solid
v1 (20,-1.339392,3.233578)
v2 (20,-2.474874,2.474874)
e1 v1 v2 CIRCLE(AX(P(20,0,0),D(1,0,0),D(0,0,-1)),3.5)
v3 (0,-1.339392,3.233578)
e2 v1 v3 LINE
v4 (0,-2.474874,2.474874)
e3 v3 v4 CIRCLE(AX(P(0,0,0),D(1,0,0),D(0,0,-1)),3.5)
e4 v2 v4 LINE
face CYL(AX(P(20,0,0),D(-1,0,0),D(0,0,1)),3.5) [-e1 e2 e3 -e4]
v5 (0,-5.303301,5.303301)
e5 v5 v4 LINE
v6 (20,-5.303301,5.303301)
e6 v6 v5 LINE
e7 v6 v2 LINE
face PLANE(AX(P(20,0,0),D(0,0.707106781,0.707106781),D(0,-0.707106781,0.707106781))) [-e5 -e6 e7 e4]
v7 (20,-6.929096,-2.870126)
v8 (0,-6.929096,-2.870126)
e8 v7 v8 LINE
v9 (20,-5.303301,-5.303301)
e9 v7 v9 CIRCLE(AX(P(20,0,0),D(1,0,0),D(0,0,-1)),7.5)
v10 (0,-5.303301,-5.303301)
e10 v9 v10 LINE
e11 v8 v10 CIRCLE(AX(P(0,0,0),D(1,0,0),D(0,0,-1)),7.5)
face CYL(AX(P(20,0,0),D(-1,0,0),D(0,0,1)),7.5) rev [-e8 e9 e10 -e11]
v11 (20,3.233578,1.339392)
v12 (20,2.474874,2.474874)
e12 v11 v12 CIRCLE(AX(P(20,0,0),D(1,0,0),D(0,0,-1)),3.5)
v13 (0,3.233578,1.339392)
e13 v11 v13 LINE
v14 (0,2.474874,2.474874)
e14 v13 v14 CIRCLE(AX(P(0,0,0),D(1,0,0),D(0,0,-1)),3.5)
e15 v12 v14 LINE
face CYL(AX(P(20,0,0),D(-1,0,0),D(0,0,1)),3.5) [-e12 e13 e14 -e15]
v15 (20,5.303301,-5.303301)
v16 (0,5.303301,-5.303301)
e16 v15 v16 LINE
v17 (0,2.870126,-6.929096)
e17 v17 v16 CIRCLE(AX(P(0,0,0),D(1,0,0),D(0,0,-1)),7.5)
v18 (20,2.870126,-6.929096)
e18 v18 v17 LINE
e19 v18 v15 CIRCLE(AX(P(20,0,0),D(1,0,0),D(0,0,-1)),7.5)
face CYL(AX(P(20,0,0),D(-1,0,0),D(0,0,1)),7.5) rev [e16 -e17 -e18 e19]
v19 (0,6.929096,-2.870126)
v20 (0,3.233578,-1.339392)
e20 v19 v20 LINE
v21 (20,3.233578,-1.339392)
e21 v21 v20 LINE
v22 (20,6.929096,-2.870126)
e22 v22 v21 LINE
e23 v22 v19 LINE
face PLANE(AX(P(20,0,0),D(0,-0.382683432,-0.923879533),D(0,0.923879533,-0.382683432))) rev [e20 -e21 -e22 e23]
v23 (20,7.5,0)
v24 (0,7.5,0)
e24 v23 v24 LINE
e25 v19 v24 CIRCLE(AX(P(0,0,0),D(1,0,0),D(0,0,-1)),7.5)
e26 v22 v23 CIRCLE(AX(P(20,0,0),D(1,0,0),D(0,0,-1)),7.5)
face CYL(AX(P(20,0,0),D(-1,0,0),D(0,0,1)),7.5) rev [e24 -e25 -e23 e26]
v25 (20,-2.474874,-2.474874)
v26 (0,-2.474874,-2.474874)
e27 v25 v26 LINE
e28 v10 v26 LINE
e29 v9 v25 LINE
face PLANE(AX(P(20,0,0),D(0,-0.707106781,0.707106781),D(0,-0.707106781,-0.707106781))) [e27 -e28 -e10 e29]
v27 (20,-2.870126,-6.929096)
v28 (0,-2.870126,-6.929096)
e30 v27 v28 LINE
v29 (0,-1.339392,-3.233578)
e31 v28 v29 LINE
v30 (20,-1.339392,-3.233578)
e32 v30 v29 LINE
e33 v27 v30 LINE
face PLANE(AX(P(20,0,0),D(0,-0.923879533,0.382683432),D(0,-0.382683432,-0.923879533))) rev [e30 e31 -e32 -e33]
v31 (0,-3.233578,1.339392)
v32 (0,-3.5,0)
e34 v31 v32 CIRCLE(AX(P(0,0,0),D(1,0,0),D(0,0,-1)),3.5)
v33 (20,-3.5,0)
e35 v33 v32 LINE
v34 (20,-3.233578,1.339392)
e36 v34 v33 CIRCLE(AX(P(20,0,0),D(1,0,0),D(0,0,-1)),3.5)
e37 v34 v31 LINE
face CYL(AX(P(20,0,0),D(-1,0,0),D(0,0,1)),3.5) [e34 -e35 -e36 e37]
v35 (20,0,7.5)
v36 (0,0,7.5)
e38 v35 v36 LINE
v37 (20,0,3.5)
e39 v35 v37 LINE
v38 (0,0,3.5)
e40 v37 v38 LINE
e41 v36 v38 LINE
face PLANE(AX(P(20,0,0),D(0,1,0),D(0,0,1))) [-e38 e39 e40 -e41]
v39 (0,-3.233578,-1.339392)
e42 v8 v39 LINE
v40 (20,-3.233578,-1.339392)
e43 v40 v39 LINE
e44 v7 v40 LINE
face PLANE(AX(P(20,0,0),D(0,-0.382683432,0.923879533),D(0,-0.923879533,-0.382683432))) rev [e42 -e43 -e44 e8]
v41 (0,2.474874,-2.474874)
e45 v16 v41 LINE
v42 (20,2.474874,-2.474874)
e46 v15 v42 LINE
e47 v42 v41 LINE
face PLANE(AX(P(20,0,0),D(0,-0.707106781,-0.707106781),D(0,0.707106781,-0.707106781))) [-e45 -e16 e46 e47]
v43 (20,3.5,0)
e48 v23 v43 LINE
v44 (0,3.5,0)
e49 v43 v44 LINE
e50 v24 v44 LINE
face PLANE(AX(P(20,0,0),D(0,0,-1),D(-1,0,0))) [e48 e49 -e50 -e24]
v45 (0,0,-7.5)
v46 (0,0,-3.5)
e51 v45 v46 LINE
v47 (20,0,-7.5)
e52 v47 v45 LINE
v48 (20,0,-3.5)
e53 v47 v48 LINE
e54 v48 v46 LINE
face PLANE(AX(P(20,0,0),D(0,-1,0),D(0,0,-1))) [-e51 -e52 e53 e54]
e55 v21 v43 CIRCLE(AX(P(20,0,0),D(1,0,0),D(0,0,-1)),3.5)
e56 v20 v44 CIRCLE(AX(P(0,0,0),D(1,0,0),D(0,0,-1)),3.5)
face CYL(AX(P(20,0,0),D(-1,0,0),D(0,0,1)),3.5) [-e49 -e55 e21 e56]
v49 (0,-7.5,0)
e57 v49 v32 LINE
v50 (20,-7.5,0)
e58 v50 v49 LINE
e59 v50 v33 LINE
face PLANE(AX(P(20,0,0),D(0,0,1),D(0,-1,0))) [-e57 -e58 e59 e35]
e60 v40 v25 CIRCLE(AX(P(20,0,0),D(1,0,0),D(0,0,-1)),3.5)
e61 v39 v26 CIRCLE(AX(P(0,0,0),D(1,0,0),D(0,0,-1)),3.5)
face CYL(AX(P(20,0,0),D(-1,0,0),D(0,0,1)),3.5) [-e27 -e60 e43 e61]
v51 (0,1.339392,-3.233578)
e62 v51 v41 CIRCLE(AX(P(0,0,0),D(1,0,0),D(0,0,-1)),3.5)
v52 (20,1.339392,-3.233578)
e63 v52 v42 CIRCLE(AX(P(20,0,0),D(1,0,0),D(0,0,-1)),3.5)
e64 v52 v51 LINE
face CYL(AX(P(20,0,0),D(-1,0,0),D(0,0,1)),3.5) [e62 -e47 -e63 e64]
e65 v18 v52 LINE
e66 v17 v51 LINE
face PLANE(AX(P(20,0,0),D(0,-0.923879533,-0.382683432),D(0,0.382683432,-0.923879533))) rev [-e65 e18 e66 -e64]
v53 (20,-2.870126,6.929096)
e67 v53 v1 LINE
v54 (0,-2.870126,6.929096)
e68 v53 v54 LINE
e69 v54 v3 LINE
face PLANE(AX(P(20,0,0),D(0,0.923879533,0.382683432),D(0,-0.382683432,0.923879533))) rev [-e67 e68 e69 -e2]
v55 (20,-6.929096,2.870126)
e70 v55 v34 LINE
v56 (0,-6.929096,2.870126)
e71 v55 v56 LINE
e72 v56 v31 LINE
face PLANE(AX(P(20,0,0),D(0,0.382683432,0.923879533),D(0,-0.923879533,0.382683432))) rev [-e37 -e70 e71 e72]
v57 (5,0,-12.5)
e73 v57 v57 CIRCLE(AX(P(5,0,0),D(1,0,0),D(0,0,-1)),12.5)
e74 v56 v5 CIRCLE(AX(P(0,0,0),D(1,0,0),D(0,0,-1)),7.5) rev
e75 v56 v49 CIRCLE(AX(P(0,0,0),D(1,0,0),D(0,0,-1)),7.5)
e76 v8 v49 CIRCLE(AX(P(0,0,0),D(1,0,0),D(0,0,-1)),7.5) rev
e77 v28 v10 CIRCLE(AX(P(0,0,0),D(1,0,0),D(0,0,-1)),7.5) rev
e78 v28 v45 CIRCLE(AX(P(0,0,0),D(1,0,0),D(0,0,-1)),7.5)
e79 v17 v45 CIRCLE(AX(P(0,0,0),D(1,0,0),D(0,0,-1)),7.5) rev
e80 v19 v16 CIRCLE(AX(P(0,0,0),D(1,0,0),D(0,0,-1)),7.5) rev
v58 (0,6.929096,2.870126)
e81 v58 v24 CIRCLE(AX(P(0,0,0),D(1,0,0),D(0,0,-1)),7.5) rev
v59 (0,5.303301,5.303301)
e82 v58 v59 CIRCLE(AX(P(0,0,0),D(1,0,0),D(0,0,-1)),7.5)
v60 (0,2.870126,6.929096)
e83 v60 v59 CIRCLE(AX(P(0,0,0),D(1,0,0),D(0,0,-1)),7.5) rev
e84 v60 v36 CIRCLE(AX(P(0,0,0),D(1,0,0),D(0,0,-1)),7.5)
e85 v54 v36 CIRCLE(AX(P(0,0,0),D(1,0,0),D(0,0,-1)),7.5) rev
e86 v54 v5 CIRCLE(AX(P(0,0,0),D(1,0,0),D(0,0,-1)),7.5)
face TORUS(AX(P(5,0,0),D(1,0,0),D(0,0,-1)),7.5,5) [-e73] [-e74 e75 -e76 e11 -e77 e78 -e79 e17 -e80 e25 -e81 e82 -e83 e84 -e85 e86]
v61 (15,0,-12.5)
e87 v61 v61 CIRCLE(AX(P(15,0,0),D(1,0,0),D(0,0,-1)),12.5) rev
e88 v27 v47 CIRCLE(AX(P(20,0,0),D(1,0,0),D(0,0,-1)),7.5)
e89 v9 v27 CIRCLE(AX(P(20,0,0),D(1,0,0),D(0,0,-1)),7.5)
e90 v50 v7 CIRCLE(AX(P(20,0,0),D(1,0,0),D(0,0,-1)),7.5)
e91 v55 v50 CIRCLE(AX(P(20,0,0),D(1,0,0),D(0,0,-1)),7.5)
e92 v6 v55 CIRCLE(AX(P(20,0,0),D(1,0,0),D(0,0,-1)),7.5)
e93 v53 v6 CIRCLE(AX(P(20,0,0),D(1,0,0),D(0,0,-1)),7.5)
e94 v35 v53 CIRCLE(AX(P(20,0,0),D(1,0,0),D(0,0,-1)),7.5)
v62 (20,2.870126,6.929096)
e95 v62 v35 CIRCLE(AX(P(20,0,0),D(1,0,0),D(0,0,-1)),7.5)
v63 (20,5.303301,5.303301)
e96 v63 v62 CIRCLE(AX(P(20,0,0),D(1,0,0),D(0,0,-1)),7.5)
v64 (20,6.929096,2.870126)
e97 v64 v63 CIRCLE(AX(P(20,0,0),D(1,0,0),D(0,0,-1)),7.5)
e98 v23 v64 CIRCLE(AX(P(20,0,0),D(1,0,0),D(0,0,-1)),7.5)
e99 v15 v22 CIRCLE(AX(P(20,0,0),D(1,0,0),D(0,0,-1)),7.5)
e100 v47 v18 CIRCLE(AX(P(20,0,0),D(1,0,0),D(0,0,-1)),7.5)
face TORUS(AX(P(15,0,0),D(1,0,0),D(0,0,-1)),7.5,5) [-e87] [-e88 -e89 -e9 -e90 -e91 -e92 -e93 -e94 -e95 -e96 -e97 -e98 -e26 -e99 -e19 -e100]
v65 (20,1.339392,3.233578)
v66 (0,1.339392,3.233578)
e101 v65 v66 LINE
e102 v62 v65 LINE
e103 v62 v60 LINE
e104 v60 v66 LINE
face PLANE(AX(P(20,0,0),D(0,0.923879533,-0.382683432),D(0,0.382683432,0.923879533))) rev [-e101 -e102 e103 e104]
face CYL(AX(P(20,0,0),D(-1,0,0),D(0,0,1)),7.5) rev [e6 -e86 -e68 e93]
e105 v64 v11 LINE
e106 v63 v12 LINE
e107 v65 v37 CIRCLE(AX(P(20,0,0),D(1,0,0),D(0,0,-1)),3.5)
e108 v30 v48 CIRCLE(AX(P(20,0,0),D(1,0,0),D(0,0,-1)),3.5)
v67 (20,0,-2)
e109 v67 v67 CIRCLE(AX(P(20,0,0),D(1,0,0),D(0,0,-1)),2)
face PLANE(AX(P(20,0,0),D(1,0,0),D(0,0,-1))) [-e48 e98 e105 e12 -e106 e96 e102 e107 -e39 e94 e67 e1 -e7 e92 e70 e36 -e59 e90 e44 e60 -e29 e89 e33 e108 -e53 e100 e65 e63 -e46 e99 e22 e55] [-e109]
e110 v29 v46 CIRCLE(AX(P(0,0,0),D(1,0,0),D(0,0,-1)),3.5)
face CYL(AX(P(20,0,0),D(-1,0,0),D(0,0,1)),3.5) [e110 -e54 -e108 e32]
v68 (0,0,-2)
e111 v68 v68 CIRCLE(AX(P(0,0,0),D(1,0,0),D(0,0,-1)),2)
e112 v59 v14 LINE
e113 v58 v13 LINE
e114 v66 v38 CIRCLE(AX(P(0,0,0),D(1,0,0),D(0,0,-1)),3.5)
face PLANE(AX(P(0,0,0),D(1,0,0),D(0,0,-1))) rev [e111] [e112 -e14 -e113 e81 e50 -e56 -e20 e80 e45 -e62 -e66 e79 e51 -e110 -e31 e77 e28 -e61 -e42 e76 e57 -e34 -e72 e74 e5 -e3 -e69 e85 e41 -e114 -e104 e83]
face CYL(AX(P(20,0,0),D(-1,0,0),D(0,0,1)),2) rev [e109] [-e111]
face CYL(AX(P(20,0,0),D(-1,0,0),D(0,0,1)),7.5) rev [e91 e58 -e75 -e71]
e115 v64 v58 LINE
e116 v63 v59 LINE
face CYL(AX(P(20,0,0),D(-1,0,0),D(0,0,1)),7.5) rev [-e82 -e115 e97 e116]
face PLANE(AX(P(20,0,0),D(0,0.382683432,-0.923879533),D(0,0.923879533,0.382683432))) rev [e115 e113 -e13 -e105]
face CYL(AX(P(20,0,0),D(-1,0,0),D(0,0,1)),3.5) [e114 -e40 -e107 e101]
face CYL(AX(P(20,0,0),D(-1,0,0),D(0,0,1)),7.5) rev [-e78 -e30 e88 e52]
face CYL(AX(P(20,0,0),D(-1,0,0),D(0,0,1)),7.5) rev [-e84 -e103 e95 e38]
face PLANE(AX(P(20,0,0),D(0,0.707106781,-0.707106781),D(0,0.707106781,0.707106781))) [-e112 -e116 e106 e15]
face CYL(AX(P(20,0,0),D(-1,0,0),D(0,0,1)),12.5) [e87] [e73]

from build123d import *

# Parameters (mm, degrees)
SKETCH2_R           = 12.5
SKETCH2_R_2         = 2
BOSS_EXTRUDE2_DEPTH = 20
FILLET2_R           = 5


with BuildPart() as part:
    # Sketch2 → Boss-Extrude2 (new body)
    with BuildSketch(Plane(origin=(0, 0, 0), x_dir=(0, 0, -1), z_dir=(1, 0, 0))):
        Circle(SKETCH2_R)
        with BuildLine():
            Line((0, 3.5), (0, 7.5))
            ThreePointArc((0, 7.5), (1.463177415, 7.355889603), (2.870125743, 6.929096494))
            Line((2.870125743, 6.929096494), (1.339392013, 3.233578364))
            ThreePointArc((1.339392013, 3.233578364), (0.682816127, 3.432748481), (0, 3.5))
        make_face(mode=Mode.SUBTRACT)
        with BuildLine():
            Line((-2.870125743, 6.929096494), (-1.339392013, 3.233578364))
            ThreePointArc((-1.339392013, 3.233578364), (-1.944495816, 2.910143643), (-2.474873734, 2.474873734))
            Line((-2.474873734, 2.474873734), (-5.303300859, 5.303300859))
            ThreePointArc((-5.303300859, 5.303300859), (-4.166776748, 6.236022092), (-2.870125743, 6.929096494))
        make_face(mode=Mode.SUBTRACT)
        with BuildLine():
            Line((-6.929096494, 2.870125743), (-3.233578364, 1.339392013))
            ThreePointArc((-3.233578364, 1.339392013), (-3.432748481, 0.682816127), (-3.5, 0))
            Line((-3.5, 0), (-7.5, 0))
            ThreePointArc((-7.5, 0), (-7.355889603, 1.463177415), (-6.929096494, 2.870125743))
        make_face(mode=Mode.SUBTRACT)
        with BuildLine():
            Line((-6.929096494, -2.870125743), (-3.233578364, -1.339392013))
            ThreePointArc((-3.233578364, -1.339392013), (-2.910143643, -1.944495816), (-2.474873734, -2.474873734))
            Line((-2.474873734, -2.474873734), (-5.303300859, -5.303300859))
            ThreePointArc((-5.303300859, -5.303300859), (-6.236022092, -4.166776748), (-6.929096494, -2.870125743))
        make_face(mode=Mode.SUBTRACT)
        with BuildLine():
            Line((-2.870125743, -6.929096494), (-1.339392013, -3.233578364))
            ThreePointArc((-1.339392013, -3.233578364), (-0.682816127, -3.432748481), (0, -3.5))
            Line((0, -3.5), (0, -7.5))
            ThreePointArc((0, -7.5), (-1.463177415, -7.355889603), (-2.870125743, -6.929096494))
        make_face(mode=Mode.SUBTRACT)
        with BuildLine():
            Line((2.870125743, -6.929096494), (1.339392013, -3.233578364))
            ThreePointArc((1.339392013, -3.233578364), (1.944495816, -2.910143643), (2.474873734, -2.474873734))
            Line((2.474873734, -2.474873734), (5.303300859, -5.303300859))
            ThreePointArc((5.303300859, -5.303300859), (4.166776748, -6.236022092), (2.870125743, -6.929096494))
        make_face(mode=Mode.SUBTRACT)
        with BuildLine():
            Line((6.929096494, -2.870125743), (3.233578364, -1.339392013))
            ThreePointArc((3.233578364, -1.339392013), (3.432748481, -0.682816127), (3.5, 0))
            Line((3.5, 0), (7.5, 0))
            ThreePointArc((7.5, 0), (7.355889603, -1.463177415), (6.929096494, -2.870125743))
        make_face(mode=Mode.SUBTRACT)
        with BuildLine():
            Line((6.929096494, 2.870125743), (3.233578364, 1.339392013))
            ThreePointArc((3.233578364, 1.339392013), (2.910143643, 1.944495816), (2.474873734, 2.474873734))
            Line((2.474873734, 2.474873734), (5.303300859, 5.303300859))
            ThreePointArc((5.303300859, 5.303300859), (6.236022092, 4.166776748), (6.929096494, 2.870125743))
        make_face(mode=Mode.SUBTRACT)
        Circle(SKETCH2_R_2, mode=Mode.SUBTRACT)
    extrude(amount=BOSS_EXTRUDE2_DEPTH)

    # Fillet2
    fillet2_edges = [part.edges().sort_by_distance(p)[0] for p in [
        (0, 0, 12.5),
        (20, 0, 12.5),
    ]]
    fillet(fillet2_edges, radius=FILLET2_R - 0.0001)  # a hair under: the kernel refuses the full size


solid = part.part
